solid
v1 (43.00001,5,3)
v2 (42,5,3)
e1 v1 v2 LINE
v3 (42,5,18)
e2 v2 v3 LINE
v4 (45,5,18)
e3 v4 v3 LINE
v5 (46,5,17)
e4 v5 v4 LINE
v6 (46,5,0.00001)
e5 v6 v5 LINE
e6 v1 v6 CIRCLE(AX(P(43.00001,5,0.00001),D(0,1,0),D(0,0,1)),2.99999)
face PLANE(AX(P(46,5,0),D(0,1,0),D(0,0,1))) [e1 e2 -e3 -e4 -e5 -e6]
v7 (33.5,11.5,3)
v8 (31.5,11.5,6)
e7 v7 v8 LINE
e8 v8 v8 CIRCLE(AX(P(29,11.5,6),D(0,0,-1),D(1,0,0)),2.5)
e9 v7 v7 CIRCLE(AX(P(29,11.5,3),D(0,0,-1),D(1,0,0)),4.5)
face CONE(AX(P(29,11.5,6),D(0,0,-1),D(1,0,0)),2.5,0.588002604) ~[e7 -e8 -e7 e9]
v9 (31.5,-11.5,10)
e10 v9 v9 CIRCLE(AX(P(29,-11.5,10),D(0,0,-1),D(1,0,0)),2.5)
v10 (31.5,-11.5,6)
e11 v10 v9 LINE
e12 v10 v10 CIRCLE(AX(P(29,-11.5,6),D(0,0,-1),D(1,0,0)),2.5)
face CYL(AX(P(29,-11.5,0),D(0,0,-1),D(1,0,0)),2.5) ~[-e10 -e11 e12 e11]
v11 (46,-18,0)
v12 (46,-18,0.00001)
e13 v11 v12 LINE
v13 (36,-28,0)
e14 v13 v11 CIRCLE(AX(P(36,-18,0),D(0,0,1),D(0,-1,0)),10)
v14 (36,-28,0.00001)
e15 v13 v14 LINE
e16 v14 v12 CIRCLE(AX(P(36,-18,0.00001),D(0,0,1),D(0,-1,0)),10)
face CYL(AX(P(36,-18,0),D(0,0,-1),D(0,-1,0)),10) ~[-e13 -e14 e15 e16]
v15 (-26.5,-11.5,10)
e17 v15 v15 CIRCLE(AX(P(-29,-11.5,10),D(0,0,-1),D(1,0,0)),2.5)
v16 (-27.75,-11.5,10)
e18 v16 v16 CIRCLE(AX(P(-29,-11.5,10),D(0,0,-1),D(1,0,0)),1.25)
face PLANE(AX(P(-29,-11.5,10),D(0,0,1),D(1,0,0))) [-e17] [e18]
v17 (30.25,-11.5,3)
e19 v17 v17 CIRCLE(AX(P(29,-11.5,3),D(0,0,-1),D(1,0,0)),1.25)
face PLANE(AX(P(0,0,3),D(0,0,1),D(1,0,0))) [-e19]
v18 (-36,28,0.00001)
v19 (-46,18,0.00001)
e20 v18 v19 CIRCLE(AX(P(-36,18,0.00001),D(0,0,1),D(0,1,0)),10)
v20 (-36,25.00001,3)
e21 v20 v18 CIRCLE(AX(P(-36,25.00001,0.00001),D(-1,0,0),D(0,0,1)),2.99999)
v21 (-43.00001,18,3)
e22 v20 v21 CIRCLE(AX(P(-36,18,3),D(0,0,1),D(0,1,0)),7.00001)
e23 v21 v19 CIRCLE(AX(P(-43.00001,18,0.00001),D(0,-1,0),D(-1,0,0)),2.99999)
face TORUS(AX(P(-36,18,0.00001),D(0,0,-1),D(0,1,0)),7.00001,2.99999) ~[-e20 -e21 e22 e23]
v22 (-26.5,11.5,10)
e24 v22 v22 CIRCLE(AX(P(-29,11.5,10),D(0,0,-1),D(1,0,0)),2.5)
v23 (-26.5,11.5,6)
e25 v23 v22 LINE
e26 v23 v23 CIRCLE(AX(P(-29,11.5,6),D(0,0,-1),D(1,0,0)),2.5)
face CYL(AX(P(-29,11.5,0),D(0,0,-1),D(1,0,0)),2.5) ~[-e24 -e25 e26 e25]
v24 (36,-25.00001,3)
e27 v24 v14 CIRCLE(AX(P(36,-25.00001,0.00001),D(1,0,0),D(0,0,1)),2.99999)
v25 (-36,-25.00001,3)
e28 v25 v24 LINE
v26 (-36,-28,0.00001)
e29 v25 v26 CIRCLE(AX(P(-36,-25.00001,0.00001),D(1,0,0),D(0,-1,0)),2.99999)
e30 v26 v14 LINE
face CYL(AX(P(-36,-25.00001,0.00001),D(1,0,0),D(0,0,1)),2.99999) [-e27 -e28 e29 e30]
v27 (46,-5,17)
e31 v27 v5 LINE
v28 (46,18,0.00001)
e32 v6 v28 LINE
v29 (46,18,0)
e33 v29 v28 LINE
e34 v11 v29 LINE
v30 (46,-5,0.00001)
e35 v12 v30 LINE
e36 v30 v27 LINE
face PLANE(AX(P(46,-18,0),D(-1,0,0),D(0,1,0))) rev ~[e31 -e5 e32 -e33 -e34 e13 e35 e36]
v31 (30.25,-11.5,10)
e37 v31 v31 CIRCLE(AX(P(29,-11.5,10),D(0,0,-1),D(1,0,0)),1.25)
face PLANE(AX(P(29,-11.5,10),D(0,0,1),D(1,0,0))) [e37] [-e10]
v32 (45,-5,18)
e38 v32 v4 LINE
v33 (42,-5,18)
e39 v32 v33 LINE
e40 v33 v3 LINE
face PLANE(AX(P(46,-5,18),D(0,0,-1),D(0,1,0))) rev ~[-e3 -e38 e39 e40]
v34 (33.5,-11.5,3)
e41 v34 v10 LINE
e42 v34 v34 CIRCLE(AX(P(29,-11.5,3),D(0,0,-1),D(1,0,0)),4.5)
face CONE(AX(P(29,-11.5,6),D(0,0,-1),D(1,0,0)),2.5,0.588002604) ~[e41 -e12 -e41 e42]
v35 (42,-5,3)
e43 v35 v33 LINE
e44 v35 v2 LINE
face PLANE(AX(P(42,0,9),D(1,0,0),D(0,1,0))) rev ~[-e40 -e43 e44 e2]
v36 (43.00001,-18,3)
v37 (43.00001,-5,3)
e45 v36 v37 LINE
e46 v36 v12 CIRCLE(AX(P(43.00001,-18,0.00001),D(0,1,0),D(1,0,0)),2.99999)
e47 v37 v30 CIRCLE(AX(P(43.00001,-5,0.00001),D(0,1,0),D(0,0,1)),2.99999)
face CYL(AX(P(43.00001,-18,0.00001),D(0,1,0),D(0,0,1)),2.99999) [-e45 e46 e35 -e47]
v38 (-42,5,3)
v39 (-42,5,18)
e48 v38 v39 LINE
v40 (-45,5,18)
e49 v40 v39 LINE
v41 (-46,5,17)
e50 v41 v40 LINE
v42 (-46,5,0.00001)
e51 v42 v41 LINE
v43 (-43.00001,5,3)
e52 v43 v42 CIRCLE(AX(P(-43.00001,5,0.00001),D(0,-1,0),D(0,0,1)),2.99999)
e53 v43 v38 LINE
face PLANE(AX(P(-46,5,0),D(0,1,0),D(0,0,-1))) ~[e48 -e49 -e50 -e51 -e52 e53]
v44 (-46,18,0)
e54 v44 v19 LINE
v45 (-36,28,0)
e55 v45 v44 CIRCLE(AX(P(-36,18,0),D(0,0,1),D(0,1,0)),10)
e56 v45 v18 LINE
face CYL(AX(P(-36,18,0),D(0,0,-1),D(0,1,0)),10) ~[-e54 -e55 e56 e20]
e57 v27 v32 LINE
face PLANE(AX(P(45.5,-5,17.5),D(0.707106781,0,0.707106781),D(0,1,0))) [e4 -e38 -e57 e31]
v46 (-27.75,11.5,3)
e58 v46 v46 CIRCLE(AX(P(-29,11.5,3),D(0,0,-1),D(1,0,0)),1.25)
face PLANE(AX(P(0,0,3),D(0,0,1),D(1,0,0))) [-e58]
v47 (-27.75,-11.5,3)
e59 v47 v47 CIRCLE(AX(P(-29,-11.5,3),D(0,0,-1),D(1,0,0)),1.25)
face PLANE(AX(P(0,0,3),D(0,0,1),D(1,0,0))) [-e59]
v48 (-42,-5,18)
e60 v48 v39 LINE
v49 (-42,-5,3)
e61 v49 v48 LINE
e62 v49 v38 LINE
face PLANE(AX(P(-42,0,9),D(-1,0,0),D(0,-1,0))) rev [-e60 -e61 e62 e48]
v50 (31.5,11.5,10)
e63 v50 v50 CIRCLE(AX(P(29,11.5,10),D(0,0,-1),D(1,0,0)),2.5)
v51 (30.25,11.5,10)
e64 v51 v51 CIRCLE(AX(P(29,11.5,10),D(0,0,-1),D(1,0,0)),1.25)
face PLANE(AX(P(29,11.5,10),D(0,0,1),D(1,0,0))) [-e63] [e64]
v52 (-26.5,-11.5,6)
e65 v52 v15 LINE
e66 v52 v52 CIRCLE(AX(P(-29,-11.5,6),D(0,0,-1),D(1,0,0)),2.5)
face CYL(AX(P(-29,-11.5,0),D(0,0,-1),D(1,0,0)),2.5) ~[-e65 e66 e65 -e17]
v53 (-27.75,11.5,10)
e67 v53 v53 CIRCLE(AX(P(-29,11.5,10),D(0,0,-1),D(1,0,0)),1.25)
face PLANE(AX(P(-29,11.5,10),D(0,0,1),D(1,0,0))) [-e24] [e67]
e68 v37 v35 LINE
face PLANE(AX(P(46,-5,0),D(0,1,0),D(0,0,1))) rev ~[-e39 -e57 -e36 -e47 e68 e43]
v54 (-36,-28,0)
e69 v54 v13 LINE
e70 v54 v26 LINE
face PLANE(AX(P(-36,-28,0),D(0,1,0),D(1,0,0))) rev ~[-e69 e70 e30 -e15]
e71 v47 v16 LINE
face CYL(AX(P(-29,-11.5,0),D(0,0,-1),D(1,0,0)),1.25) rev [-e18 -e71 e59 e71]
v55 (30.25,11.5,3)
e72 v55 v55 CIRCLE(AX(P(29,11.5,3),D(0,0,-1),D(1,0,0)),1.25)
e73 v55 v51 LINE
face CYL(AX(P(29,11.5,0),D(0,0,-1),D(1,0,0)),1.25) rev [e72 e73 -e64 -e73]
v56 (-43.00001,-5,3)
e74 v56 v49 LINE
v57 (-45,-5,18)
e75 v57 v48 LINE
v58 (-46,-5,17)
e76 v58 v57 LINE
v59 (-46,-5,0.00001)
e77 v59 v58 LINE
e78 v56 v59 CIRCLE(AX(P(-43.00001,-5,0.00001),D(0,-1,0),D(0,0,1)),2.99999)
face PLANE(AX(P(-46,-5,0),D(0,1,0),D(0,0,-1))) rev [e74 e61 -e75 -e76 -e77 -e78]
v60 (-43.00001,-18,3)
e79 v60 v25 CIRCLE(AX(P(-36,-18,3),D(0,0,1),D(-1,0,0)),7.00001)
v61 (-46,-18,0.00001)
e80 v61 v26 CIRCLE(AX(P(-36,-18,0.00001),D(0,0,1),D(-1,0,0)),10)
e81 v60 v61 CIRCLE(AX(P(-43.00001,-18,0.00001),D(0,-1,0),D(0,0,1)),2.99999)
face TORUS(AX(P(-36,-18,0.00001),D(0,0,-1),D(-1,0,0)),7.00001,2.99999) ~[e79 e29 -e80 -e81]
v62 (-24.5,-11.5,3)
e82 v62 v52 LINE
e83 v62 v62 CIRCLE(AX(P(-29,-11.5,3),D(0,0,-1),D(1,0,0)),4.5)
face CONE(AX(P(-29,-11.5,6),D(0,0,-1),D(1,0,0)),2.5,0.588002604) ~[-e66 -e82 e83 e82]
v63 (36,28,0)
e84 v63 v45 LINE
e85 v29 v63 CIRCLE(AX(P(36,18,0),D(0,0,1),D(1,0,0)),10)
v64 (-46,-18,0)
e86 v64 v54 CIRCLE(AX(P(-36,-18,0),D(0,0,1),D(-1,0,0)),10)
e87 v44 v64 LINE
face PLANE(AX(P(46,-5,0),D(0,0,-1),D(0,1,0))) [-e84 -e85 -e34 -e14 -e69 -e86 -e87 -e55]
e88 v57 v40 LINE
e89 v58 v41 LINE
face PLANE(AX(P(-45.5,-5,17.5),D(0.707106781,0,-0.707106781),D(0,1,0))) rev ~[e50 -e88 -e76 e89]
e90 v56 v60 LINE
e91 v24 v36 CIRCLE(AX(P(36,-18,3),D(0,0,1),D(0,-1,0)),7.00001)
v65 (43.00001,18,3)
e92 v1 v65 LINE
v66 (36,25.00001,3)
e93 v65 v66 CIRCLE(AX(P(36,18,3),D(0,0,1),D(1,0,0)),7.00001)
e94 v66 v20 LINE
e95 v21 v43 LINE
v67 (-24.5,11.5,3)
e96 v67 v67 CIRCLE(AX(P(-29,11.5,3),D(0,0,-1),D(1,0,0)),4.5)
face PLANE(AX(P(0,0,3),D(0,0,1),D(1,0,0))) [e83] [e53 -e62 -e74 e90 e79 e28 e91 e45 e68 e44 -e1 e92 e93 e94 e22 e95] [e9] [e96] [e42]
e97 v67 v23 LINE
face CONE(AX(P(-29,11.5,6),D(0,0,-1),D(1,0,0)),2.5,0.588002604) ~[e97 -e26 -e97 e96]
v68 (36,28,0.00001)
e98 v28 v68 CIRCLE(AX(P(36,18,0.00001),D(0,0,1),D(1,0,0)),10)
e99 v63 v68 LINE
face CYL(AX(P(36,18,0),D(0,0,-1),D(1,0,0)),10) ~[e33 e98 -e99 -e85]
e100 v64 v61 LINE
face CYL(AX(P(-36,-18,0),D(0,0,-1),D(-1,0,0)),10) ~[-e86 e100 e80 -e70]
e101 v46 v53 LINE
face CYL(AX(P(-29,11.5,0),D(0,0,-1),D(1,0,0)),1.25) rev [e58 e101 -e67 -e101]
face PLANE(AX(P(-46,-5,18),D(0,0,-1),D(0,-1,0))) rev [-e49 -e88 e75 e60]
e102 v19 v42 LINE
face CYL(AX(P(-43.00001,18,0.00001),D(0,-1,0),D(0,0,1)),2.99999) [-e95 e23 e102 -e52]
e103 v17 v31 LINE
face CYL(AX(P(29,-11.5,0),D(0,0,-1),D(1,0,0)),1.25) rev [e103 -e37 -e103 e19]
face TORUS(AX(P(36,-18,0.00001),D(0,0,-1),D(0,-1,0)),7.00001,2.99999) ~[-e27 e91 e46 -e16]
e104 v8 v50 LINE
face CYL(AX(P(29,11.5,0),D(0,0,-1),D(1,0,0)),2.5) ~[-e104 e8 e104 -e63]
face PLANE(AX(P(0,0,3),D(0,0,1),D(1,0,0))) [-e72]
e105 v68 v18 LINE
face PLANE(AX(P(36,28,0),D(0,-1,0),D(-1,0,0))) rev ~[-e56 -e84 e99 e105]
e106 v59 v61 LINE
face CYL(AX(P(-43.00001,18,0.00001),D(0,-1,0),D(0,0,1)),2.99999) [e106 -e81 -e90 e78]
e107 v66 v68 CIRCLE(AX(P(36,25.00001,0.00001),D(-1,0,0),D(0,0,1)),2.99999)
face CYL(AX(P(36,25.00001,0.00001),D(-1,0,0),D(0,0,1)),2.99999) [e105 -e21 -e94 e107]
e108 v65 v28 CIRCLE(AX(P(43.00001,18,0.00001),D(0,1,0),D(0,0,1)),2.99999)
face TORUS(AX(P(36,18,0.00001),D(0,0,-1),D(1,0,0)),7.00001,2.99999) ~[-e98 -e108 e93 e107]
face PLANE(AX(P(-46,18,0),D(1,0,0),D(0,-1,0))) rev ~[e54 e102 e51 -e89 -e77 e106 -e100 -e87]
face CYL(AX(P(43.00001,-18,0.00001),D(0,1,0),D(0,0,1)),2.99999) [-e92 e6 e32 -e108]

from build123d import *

# Parameters (mm, degrees)
F2_DEPTH = 3
F1_R     = 2.5
F1_R_2   = 1.25
F3_DEPTH = 10
F4_SIZE2 = 3
F4_SIZE  = 2
F5_R     = 2.99999
F7_W     = 10
F7_H     = 18
F8_DEPTH = 4
F10_SIZE = 1


# Not quite as in the source:
# - a fillet or chamfer is up to 0.001 mm smaller than in the source, because OpenCascade refuses the exact size


with BuildPart() as f2:
    # F0 (on Top) → F2 (new body)
    with BuildSketch(Plane.XY):
        with BuildLine():
            ThreePointArc((46, 18), (43.0710678119, 25.0710678119), (36, 28))
            Line((36, 28), (-36, 28))
            ThreePointArc((-36, 28), (-43.0710678119, 25.0710678119), (-46, 18))
            Line((-46, 18), (-46, -18))
            ThreePointArc((-46, -18), (-43.0710678119, -25.0710678119), (-36, -28))
            Line((-36, -28), (36, -28))
            ThreePointArc((36, -28), (43.0710678119, -25.0710678119), (46, -18))
            Line((46, -18), (46, 18))
        make_face()
    extrude(amount=F2_DEPTH)

    # F1 (on Top) → F3 (join)
    with BuildSketch(Plane.XY):
        with Locations((-29, 11.5)):
            Circle(F1_R)
        with Locations((-29, 11.5)):
            Circle(F1_R_2, mode=Mode.SUBTRACT)
        with Locations((29, 11.5)):
            Circle(F1_R)
        with Locations((29, 11.5)):
            Circle(F1_R_2, mode=Mode.SUBTRACT)
        with Locations((-29, -11.5)):
            Circle(F1_R)
        with Locations((-29, -11.5)):
            Circle(F1_R_2, mode=Mode.SUBTRACT)
        with Locations((29, -11.5)):
            Circle(F1_R)
        with Locations((29, -11.5)):
            Circle(F1_R_2, mode=Mode.SUBTRACT)
    extrude(amount=F3_DEPTH)

    # F4
    f4_edges = [f2.edges().sort_by_distance(p)[0] for p in [
        (-31.5, 11.5, 3),
        (26.5, 11.5, 3),
        (26.5, -11.5, 3),
        (-31.5, -11.5, 3),
    ]]
    chamfer(f4_edges, length=F4_SIZE, length2=F4_SIZE2)

    # F5 (radius 3 in the source; OpenCascade refuses exactly that, so slightly less here)
    f5_edges = [f2.edges().sort_by_distance(p)[0] for p in [
        (0, 28, 3),
    ]]
    fillet(f5_edges, radius=F5_R)

    # F7 (on offset) → F8 (join)
    with BuildSketch(Plane.YZ.offset(46)):
        with Locations((0, 9)):
            Rectangle(F7_W, F7_H)
    extrude(amount=-F8_DEPTH)

    # F9: F2 across plane


with BuildPart() as f2_1:
    add(f2.part)
    add(f2.part.mirror(Plane.YZ))

    # F10
    f10_edges = [f2_1.edges().sort_by_distance(p)[0] for p in [
        (-46, 0, 18),
        (46, 0, 18),
    ]]
    chamfer(f10_edges, length=F10_SIZE)


solid = f2_1.part
